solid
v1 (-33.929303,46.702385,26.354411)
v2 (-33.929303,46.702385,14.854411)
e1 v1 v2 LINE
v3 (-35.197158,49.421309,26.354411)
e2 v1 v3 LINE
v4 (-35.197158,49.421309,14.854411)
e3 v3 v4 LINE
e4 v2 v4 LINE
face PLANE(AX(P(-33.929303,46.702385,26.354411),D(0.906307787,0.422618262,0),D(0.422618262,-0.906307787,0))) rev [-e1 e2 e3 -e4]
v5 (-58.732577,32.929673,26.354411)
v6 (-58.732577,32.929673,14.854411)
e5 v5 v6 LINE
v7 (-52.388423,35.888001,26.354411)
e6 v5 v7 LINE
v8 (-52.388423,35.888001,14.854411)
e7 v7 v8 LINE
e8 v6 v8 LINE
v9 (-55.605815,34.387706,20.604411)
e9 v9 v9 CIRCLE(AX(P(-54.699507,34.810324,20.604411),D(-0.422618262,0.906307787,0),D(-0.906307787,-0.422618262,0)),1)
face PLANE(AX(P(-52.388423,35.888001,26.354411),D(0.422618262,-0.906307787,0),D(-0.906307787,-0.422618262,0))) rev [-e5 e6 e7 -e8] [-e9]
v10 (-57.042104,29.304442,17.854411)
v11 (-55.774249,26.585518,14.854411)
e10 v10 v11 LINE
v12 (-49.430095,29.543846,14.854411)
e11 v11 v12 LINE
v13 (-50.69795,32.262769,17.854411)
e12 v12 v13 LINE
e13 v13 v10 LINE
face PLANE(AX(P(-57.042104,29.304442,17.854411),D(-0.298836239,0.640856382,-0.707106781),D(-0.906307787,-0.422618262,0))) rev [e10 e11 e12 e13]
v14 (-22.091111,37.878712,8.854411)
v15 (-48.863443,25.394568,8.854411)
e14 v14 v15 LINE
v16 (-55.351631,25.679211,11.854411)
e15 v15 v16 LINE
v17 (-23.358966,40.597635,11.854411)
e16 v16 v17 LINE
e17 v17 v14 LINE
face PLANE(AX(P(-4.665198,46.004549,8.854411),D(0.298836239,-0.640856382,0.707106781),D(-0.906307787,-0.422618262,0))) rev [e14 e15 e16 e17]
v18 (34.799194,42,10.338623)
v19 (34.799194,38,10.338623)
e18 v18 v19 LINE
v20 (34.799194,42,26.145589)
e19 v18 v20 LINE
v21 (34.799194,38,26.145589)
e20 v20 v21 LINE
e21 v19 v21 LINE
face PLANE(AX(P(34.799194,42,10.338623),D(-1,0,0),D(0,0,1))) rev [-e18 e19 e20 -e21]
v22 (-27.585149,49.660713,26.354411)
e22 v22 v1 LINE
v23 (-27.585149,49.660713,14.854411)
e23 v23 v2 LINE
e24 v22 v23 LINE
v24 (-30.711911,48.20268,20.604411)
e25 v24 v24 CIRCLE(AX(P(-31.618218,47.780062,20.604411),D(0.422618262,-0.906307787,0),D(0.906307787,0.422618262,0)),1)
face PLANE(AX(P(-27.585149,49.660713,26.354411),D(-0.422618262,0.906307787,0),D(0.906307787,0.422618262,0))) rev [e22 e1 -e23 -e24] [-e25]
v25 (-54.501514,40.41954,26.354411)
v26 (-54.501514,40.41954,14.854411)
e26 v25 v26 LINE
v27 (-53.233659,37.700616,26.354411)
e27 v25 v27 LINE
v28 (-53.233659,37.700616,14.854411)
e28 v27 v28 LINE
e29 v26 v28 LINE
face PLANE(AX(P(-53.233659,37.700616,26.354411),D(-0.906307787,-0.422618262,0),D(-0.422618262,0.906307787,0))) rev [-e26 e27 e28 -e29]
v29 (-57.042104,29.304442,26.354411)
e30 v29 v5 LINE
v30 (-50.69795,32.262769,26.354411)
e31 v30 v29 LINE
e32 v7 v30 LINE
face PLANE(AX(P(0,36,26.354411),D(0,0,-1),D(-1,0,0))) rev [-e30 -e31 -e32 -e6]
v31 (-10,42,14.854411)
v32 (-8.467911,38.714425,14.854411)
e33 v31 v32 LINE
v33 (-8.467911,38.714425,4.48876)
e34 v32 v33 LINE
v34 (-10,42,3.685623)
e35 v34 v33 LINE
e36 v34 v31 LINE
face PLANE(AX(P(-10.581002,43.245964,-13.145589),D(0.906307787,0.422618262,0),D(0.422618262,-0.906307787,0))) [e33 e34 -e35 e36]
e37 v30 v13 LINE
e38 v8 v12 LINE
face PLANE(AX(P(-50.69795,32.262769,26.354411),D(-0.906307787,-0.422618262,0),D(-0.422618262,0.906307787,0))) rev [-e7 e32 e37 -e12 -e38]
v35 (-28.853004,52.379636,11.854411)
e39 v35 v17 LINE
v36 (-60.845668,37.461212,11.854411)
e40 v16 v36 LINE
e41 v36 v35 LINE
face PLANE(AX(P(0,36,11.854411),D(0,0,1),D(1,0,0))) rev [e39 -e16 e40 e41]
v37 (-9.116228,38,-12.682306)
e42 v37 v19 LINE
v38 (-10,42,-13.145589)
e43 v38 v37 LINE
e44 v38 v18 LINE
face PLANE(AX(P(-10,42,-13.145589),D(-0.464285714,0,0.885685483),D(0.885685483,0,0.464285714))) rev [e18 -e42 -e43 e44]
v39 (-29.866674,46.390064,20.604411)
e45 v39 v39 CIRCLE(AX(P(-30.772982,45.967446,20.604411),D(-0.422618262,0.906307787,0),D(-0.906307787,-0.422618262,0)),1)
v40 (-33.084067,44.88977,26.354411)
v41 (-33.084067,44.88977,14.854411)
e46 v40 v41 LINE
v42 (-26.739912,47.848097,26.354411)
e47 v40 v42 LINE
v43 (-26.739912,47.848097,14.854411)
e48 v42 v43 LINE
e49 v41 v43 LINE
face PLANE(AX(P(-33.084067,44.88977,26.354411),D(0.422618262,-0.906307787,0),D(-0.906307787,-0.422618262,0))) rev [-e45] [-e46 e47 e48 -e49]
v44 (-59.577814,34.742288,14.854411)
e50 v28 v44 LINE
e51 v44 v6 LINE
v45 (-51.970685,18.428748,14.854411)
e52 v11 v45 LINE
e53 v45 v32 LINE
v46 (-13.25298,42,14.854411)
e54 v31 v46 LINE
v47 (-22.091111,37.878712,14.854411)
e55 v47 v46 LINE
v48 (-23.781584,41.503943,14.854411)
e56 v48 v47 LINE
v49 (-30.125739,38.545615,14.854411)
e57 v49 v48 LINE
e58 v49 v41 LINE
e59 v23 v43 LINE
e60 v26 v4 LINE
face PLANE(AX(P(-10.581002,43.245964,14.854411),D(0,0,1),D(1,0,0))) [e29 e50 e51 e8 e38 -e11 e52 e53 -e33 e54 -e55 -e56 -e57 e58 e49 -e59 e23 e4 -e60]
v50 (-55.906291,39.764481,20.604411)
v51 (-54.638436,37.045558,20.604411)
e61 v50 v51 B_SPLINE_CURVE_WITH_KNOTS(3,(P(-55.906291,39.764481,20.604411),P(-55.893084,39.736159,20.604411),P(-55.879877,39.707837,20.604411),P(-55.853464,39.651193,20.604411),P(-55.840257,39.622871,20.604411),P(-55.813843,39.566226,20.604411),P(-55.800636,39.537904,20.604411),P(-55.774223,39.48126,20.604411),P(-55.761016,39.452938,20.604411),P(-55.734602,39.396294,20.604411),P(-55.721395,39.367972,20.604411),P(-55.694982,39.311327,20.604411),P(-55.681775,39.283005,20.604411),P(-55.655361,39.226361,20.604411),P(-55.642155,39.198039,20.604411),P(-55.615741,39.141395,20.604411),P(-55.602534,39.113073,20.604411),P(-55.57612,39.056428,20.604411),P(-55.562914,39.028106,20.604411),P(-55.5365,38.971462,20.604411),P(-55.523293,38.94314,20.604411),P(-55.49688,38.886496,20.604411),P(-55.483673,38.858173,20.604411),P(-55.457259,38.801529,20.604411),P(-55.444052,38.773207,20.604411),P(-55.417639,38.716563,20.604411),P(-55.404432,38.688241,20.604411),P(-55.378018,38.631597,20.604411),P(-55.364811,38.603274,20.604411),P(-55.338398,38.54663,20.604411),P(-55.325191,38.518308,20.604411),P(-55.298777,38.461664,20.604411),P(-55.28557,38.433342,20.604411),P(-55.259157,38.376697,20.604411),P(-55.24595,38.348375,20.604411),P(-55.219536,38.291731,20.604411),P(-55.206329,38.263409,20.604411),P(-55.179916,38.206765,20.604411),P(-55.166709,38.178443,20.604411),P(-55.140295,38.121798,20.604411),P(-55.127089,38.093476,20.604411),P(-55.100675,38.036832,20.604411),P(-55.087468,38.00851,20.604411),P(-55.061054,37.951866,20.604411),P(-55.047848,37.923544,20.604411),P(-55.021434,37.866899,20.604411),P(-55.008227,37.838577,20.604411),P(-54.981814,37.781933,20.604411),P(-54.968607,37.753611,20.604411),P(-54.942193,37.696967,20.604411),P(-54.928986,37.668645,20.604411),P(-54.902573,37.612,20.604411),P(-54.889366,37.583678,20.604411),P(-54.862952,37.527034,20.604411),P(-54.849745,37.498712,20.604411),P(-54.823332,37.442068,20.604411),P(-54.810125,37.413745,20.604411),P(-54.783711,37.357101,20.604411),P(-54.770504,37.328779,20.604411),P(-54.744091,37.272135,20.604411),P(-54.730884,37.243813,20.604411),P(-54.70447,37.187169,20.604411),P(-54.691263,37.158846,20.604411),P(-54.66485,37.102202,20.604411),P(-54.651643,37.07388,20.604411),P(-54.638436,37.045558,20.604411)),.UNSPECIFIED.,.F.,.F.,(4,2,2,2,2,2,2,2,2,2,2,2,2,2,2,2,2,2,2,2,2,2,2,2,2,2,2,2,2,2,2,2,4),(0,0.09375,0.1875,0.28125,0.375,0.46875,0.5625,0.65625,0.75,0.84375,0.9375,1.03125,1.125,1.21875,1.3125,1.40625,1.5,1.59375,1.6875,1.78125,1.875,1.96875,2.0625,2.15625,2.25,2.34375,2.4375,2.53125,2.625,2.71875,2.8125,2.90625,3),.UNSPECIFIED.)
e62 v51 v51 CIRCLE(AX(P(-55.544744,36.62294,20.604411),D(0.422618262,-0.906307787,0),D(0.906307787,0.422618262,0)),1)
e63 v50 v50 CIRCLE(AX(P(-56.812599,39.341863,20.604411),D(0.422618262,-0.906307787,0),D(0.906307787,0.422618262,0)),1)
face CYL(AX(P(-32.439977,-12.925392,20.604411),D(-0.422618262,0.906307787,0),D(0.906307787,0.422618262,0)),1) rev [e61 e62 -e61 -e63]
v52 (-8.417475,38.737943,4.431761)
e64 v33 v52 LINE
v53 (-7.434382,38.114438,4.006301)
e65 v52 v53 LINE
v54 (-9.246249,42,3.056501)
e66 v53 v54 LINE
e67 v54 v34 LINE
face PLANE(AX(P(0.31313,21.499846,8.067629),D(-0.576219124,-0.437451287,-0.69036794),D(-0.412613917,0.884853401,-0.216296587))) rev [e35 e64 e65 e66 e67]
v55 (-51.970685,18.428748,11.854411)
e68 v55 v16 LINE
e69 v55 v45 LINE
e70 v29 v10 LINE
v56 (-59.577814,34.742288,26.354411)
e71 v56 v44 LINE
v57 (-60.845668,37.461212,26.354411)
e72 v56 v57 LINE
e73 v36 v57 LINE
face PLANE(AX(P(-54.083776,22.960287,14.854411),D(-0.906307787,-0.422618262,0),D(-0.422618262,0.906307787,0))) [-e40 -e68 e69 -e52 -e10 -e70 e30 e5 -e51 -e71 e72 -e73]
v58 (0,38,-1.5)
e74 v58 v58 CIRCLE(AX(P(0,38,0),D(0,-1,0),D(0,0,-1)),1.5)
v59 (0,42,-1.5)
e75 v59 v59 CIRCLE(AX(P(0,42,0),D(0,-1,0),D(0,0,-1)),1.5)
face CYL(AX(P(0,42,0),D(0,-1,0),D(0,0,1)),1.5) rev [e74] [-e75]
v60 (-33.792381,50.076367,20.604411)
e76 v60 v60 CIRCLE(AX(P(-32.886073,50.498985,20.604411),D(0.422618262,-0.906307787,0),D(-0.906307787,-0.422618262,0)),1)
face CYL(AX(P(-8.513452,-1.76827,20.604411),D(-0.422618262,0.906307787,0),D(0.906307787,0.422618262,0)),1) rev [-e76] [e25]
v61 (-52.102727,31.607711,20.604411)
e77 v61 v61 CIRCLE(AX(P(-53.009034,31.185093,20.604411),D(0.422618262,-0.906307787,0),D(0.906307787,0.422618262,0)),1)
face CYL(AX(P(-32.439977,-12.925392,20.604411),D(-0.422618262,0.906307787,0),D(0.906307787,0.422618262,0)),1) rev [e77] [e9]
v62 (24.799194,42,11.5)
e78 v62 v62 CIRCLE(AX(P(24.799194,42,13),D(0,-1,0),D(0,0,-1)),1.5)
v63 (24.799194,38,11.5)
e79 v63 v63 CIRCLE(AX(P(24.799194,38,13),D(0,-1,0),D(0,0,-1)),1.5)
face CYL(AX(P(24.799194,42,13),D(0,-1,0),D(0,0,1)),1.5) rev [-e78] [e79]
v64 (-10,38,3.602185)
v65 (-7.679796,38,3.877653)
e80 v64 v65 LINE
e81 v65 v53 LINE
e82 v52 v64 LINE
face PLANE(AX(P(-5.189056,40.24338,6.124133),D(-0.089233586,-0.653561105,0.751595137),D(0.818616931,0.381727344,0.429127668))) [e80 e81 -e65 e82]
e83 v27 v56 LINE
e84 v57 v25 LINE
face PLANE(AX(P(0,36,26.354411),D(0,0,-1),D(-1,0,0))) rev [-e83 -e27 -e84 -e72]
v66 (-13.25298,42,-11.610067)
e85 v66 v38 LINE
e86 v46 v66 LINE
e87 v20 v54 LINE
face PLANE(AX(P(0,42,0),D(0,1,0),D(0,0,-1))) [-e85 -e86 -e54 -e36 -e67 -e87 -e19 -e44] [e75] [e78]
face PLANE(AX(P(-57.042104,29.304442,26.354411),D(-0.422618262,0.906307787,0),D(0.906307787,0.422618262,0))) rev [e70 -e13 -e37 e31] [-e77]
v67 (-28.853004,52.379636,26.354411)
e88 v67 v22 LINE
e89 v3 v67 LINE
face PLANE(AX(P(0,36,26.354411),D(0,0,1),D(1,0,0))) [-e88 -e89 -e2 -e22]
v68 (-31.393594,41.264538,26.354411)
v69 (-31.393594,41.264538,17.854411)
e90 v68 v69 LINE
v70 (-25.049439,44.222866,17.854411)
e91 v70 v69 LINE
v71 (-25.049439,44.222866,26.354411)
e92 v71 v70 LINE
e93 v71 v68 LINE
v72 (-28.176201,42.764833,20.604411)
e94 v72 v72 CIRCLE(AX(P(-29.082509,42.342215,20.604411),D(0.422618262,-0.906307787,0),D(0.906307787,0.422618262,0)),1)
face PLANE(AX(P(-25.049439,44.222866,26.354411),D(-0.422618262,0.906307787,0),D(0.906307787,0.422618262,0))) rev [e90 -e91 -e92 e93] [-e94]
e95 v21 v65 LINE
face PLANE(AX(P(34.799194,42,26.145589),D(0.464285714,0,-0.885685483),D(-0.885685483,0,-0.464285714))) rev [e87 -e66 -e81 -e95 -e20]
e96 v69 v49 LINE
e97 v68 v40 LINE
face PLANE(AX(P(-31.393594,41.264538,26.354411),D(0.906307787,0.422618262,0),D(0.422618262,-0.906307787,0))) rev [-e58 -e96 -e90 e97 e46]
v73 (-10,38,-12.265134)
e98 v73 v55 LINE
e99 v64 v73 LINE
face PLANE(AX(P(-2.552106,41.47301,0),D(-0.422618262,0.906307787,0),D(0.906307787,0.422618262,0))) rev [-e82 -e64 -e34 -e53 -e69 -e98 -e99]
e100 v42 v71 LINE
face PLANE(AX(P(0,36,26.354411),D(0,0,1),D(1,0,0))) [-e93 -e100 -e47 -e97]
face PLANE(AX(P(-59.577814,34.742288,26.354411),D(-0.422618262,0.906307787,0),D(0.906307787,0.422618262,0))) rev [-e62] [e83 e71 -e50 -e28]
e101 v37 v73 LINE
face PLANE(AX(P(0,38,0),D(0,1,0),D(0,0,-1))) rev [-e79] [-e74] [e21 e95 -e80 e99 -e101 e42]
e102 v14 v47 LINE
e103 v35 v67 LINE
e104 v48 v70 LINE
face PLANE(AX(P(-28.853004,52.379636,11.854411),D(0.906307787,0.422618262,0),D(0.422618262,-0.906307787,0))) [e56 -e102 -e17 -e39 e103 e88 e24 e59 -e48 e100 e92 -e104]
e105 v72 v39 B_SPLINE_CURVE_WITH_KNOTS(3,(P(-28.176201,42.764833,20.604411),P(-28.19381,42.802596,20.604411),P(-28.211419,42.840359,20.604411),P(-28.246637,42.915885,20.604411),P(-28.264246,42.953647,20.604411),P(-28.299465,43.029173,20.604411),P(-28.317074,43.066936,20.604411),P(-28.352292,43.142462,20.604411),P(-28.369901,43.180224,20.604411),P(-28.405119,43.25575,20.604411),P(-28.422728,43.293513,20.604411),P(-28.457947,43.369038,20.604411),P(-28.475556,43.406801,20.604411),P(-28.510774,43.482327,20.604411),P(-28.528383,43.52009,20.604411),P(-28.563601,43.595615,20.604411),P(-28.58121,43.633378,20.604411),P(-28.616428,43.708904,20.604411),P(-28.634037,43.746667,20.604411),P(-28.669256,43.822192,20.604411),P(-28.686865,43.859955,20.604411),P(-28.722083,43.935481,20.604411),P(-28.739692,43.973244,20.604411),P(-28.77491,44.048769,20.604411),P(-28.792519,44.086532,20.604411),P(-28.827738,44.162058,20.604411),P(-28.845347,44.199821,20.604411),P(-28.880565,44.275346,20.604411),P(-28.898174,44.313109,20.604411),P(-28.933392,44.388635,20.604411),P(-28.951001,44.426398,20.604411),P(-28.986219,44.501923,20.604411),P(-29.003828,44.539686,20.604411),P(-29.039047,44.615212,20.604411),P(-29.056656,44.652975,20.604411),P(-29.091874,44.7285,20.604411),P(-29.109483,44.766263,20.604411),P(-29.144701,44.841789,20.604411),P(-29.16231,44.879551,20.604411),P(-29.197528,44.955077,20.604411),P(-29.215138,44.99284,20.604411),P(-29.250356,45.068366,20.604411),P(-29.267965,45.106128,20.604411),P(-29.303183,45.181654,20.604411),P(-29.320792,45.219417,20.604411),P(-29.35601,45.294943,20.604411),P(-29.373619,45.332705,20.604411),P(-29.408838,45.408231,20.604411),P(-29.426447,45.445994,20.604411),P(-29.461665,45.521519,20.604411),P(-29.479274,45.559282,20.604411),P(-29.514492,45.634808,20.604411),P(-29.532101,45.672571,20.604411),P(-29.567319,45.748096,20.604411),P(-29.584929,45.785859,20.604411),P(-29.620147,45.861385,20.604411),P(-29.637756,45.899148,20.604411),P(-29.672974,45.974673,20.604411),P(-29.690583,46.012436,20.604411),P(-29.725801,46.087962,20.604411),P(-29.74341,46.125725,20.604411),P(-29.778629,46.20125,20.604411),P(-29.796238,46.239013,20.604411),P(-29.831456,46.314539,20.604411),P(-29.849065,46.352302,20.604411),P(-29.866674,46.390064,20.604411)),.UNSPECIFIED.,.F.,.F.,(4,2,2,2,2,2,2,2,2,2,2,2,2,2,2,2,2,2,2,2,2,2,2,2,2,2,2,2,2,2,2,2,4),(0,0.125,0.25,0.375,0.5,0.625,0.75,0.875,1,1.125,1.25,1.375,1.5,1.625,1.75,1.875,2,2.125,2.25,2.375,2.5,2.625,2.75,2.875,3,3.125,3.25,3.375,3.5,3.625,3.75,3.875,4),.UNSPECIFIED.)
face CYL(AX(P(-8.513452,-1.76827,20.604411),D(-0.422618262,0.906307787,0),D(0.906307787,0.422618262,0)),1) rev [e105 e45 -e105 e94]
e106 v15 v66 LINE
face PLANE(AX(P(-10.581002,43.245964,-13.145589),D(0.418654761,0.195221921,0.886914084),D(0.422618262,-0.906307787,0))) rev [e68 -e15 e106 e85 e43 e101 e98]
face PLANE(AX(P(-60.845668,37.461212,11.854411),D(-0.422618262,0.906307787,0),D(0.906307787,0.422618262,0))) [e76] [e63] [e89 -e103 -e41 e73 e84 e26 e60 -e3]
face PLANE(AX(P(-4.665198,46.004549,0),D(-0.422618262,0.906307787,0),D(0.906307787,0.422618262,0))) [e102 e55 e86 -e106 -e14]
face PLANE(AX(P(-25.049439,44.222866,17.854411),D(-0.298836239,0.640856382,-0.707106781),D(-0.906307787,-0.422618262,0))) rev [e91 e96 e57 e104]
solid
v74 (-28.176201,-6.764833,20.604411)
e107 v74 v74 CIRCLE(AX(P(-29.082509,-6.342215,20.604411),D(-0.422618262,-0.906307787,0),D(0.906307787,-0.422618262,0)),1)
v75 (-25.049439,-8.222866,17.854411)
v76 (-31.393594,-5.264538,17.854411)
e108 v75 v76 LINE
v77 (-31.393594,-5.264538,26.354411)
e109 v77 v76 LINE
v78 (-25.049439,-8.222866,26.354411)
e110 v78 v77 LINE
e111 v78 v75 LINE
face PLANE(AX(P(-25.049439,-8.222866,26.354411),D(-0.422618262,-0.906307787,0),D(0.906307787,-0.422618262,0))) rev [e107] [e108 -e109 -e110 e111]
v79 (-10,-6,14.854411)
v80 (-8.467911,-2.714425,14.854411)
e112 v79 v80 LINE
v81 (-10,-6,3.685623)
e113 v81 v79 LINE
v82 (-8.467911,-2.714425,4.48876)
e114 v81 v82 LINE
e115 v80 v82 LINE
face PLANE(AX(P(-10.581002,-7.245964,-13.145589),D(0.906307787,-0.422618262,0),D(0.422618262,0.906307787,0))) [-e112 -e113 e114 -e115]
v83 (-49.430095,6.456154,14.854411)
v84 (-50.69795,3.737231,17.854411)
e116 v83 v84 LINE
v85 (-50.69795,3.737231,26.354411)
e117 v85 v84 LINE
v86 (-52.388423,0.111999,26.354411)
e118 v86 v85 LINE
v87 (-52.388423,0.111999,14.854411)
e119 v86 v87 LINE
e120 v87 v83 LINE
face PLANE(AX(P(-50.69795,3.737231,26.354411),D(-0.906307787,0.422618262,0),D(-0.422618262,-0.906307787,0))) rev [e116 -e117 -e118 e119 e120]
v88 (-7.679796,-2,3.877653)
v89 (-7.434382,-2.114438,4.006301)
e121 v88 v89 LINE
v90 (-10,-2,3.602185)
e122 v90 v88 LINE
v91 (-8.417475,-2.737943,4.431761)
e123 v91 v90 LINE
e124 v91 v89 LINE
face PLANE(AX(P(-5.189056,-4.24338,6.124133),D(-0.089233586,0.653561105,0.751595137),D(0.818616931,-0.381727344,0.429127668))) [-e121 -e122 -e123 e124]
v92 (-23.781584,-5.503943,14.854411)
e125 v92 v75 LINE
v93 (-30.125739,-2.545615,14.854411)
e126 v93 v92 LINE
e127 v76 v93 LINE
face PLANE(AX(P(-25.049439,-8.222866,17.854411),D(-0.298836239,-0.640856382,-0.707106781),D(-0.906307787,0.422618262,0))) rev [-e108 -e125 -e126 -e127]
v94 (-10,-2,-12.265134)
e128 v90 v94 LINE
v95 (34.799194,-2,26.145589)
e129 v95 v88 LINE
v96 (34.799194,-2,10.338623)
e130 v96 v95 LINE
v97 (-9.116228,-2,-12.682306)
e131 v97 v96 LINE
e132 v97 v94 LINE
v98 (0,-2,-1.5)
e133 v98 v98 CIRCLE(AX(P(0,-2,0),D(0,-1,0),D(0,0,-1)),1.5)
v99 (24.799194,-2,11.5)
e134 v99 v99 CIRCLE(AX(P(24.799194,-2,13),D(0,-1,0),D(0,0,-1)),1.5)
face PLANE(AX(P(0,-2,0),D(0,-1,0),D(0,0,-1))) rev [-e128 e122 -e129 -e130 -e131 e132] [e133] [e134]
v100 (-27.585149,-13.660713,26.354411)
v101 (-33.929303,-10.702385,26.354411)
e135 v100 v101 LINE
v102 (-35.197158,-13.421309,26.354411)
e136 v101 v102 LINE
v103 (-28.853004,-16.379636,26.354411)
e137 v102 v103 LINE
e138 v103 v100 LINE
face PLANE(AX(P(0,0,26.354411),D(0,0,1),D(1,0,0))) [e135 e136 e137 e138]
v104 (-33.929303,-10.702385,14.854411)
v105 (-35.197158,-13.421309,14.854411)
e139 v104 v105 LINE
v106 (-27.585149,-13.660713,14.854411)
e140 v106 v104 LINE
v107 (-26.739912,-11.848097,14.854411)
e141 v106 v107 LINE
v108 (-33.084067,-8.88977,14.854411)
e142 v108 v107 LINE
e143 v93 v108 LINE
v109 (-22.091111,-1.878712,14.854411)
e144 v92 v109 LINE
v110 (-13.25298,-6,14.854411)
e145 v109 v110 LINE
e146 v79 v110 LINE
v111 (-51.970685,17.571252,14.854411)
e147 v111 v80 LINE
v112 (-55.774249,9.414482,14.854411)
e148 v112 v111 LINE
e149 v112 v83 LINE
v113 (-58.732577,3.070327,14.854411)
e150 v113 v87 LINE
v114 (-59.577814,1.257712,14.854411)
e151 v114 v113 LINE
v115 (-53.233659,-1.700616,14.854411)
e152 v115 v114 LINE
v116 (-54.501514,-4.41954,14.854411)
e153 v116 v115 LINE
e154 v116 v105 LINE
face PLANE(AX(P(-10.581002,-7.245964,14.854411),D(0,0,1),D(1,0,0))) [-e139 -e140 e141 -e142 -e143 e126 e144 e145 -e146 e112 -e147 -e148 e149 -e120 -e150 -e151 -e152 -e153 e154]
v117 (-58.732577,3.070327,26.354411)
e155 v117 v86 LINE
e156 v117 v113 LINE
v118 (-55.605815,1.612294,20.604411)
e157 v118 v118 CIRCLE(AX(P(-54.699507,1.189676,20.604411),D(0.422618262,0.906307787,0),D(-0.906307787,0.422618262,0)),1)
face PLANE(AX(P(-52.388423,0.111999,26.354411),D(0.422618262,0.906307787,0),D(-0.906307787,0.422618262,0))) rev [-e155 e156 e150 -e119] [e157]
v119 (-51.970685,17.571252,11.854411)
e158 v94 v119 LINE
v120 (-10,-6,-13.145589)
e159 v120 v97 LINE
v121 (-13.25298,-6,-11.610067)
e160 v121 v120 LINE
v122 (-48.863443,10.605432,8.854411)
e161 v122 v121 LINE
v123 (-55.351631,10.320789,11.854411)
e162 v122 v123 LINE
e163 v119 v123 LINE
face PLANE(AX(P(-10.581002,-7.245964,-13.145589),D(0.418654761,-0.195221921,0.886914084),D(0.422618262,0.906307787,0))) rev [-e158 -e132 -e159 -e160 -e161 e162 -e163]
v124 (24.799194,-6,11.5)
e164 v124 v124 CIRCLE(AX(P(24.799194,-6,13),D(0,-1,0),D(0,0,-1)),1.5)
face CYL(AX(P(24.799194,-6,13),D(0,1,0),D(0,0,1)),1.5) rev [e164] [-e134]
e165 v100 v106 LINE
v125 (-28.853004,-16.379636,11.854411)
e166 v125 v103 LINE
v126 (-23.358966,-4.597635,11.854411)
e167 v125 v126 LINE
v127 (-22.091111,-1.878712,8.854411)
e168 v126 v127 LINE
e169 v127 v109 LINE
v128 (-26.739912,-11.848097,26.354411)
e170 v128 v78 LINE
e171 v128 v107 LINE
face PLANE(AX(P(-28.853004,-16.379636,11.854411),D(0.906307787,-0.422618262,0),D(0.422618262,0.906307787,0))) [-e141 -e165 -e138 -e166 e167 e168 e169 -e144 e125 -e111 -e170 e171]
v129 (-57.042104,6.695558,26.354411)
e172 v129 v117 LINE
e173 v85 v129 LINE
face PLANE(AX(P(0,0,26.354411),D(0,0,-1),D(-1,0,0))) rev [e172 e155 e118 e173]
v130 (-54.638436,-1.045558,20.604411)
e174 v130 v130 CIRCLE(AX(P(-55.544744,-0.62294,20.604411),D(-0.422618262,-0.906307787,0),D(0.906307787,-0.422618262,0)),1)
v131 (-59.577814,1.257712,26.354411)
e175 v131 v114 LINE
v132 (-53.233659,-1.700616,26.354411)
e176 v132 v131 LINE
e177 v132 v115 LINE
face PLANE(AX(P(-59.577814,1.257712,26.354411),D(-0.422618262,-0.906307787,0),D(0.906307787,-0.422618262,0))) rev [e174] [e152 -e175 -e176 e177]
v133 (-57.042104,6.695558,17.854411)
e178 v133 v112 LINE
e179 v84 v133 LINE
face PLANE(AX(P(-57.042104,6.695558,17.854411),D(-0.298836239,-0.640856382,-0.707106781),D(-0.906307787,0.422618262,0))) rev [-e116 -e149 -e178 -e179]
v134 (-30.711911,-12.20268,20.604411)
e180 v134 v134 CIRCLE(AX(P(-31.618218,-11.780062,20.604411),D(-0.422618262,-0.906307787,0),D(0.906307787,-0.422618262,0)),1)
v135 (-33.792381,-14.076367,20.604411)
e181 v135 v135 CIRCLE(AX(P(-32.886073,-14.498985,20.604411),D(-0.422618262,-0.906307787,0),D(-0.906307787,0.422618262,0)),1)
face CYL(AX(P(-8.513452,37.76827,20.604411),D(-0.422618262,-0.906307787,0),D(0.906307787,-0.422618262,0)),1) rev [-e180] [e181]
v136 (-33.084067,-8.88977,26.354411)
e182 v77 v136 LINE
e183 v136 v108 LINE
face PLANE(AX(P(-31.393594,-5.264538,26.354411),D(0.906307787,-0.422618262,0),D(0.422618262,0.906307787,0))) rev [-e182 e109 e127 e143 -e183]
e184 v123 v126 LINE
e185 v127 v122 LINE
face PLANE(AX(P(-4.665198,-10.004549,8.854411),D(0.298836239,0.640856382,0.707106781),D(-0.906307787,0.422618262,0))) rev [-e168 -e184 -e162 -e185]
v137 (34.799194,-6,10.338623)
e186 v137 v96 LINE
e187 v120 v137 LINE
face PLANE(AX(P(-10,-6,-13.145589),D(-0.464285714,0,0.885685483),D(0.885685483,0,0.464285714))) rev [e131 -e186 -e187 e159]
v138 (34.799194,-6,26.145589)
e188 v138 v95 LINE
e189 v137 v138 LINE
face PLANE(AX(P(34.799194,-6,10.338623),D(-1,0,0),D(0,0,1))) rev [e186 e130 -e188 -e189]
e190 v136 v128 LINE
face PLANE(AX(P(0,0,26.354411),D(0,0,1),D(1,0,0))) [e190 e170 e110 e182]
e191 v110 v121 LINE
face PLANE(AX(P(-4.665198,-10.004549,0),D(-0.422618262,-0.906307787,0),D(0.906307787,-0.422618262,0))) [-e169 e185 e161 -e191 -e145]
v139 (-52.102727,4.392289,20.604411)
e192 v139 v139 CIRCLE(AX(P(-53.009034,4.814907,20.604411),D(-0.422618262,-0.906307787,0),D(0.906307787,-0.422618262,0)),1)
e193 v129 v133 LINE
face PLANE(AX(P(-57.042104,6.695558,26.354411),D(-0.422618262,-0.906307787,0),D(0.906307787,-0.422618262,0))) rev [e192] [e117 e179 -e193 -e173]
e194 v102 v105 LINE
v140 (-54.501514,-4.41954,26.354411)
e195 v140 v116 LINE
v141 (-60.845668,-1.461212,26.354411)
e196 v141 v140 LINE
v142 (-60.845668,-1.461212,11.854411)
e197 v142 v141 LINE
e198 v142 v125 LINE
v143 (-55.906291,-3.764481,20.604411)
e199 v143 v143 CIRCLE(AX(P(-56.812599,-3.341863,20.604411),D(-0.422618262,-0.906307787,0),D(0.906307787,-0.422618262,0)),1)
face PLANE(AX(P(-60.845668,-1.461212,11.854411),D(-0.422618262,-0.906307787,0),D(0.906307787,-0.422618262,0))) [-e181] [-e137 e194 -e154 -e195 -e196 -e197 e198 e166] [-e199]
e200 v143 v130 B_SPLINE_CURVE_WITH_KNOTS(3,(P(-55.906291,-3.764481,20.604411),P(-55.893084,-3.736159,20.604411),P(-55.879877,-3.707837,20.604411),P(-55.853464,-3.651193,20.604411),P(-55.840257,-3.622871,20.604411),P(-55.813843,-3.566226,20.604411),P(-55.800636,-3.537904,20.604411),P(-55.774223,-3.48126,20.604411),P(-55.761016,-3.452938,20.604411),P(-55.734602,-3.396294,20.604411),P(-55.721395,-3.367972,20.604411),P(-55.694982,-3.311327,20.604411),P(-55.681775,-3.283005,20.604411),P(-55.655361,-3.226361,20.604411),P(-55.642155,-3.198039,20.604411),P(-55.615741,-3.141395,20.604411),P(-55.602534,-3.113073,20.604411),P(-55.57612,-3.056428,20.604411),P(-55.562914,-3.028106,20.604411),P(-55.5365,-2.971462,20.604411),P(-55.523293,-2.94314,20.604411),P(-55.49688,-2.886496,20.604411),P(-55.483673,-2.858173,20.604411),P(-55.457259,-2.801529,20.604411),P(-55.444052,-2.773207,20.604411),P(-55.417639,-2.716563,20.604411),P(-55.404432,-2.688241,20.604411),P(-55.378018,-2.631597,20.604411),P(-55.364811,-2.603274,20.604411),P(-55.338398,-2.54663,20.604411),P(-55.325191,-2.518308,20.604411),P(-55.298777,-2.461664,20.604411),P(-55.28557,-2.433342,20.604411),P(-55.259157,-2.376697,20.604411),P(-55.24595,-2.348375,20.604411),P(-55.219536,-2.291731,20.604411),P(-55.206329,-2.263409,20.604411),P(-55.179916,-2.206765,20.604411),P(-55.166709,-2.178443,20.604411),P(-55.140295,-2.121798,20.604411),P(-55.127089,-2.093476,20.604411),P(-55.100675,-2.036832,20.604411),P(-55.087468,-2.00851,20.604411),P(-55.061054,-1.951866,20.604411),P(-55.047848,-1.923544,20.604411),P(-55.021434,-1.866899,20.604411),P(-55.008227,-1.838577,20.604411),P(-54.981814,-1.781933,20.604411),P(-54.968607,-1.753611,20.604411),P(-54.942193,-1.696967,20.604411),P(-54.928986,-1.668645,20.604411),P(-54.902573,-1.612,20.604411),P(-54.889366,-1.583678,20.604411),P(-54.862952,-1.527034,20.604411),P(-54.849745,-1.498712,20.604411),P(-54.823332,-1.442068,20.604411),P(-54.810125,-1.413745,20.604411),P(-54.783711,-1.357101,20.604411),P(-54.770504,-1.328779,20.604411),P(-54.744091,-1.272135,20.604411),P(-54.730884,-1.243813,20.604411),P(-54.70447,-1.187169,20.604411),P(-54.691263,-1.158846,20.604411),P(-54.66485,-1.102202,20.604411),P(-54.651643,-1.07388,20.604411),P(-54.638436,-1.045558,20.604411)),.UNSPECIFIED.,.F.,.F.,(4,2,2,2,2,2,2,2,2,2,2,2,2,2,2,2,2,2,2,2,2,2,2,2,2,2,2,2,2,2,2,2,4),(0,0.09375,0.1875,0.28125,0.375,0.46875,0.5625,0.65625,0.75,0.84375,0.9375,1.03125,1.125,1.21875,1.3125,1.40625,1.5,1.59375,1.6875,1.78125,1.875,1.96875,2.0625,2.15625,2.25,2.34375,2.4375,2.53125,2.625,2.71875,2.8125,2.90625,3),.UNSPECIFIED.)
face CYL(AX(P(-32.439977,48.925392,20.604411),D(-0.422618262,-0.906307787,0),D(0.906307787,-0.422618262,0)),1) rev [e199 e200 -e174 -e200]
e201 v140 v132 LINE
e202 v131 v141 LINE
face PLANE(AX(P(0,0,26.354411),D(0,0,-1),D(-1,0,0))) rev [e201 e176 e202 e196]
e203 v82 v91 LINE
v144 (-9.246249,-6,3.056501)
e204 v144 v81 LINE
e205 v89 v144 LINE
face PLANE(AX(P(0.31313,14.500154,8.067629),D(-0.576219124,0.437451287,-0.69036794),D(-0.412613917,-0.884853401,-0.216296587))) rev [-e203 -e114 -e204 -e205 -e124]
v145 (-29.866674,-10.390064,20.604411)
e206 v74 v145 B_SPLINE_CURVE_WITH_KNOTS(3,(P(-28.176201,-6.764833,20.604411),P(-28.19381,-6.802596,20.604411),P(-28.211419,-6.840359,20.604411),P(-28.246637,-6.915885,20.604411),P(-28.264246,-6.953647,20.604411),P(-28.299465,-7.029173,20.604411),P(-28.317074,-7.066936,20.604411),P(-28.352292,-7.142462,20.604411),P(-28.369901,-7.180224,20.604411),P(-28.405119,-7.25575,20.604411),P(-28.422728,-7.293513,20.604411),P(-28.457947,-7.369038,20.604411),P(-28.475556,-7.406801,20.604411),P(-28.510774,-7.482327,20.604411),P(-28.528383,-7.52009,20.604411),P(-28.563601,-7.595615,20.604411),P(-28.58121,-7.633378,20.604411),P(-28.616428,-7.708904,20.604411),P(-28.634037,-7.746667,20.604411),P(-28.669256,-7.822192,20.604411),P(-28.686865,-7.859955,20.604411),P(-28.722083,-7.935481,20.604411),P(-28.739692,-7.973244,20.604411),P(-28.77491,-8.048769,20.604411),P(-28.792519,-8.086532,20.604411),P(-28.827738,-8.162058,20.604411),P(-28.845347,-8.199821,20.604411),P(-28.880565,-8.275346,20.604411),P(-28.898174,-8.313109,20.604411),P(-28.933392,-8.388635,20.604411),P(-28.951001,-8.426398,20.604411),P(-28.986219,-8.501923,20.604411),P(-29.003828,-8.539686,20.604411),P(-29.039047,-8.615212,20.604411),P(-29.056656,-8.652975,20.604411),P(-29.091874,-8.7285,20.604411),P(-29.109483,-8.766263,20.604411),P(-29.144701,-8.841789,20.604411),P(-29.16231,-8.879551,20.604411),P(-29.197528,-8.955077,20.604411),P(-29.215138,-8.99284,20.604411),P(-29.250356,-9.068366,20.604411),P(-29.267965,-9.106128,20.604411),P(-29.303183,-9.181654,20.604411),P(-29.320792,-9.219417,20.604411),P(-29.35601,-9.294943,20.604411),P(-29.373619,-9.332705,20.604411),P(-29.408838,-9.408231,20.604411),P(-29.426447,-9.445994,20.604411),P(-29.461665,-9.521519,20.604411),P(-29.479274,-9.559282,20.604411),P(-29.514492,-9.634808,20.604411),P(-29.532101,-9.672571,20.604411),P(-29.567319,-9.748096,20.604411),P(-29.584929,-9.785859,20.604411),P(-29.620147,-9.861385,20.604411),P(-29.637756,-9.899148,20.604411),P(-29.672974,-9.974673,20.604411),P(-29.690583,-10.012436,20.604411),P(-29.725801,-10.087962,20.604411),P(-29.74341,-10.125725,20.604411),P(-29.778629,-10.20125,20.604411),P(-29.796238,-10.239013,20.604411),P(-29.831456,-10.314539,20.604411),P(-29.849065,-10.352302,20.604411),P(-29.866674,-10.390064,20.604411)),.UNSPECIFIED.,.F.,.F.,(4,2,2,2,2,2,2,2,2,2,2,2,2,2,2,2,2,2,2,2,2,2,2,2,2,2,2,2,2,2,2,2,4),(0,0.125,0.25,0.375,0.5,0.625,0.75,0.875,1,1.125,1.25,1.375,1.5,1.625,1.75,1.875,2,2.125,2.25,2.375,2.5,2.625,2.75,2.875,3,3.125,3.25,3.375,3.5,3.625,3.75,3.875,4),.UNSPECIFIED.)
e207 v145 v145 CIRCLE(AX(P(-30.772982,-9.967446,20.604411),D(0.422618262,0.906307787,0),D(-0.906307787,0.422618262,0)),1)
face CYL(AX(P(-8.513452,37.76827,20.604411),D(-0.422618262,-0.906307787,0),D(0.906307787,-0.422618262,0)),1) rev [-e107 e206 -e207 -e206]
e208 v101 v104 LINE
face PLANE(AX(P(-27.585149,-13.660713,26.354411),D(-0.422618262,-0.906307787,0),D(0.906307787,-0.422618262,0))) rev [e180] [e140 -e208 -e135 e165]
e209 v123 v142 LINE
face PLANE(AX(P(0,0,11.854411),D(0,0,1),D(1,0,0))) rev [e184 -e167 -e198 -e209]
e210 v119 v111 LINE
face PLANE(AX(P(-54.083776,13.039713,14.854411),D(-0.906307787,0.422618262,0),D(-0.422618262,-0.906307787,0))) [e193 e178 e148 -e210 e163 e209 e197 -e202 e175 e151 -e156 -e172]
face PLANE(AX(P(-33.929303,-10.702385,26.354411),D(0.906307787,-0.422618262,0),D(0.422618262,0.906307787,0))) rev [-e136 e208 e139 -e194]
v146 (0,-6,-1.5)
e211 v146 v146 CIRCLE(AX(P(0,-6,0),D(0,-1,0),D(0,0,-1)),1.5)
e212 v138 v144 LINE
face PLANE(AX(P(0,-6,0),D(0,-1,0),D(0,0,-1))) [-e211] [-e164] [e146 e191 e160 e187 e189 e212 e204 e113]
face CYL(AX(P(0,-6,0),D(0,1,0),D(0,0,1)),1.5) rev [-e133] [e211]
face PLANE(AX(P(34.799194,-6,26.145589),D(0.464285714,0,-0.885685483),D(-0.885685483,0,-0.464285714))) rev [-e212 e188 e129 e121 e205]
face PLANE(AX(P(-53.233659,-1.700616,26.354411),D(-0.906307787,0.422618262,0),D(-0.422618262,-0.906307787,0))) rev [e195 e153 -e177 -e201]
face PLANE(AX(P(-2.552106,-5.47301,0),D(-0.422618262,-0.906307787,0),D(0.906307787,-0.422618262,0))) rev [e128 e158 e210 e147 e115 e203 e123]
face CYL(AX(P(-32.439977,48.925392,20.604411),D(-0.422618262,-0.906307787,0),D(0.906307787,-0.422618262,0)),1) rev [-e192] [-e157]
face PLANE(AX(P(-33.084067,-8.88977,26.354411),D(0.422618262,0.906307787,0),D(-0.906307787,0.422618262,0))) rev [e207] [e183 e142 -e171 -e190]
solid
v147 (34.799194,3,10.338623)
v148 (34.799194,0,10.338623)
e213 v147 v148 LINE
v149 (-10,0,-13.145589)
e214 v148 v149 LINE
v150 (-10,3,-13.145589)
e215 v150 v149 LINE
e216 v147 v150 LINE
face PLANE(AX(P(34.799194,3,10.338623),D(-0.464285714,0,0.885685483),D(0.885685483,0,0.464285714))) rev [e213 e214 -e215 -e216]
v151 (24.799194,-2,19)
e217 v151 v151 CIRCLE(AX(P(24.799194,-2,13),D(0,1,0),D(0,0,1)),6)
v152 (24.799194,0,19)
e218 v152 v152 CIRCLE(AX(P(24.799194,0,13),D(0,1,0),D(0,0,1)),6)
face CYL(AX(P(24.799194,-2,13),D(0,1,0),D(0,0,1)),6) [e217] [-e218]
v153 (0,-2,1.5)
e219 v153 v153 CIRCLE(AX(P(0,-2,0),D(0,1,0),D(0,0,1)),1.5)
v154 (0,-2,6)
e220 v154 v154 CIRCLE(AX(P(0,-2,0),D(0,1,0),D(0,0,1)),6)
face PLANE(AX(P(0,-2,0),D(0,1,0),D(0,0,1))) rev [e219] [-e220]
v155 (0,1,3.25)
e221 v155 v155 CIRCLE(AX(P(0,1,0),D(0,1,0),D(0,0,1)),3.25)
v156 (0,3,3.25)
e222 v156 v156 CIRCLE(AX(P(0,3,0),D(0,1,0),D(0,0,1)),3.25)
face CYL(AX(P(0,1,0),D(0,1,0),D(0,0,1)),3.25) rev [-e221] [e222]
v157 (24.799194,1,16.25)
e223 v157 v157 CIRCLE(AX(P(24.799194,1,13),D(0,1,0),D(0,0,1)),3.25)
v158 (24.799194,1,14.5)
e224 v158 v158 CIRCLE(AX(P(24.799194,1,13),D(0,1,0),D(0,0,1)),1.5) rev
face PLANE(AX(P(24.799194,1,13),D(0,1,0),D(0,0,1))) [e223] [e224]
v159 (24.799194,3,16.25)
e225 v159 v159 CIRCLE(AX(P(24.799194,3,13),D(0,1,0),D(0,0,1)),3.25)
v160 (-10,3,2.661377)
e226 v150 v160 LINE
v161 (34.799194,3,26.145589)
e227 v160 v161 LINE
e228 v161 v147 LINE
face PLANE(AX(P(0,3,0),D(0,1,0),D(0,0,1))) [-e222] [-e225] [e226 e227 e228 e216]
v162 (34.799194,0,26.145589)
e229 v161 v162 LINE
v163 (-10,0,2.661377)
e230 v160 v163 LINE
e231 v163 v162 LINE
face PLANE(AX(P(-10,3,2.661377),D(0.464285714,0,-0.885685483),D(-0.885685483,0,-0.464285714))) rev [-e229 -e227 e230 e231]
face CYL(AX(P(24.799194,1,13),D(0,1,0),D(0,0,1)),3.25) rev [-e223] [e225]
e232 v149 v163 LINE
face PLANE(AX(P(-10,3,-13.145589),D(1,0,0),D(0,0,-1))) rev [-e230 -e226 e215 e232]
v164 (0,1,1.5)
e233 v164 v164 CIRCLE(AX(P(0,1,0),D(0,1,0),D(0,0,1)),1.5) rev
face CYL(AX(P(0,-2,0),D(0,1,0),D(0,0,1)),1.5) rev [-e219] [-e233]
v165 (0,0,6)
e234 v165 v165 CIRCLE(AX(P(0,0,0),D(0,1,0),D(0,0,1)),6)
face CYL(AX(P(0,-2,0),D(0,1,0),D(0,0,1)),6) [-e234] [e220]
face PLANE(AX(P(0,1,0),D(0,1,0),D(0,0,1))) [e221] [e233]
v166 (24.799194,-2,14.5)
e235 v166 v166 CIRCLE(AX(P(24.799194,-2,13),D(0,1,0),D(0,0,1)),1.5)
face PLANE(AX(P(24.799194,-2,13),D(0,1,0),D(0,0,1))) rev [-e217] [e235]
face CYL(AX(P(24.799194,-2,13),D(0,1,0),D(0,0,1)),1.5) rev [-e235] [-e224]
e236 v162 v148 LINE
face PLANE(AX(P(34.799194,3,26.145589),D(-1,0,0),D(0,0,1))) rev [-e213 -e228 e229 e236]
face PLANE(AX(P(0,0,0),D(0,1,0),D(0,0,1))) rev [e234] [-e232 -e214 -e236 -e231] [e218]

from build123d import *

# Parameters (mm, degrees)
BOSS_EXTRUDE1_DEPTH  = 3
SKETCH1_R            = 6
SKETCH1_R_2          = 5.999999999999998
BOSS_EXTRUDE3_DEPTH  = 2
SKETCH4_R            = 1.5000000000000013
SKETCH4_R_2          = 1.5000000000000009
CUT_EXTRUDE1_DEPTH   = 44.812962496801305
SKETCH5_R            = 3.25
SKETCH5_R_2          = 3.2500000000000004
CUT_EXTRUDE2_DEPTH   = 2
SKETCH6_R            = 1.5000000000000013
SKETCH6_R_2          = 1.5000000000000009
BOSS_EXTRUDE4_DEPTH  = 4
BOSS_EXTRUDE9_DEPTH  = 5
BOSS_EXTRUDE10_DEPTH = 3
BOSS_EXTRUDE11_DEPTH = 11.5
SKETCH24_R           = 0.9999999999999983
CUT_EXTRUDE3_DEPTH   = 71.05142175706676
CUT_EXTRUDE4_DEPTH   = 71.37296543116399
CUT_EXTRUDE5_DEPTH   = 75.00527115702536
CHAMFER2_SIZE        = 1
CHAMFER2_SIZE_2      = 0.849779112
CHAMFER2_SIZE_3      = 0.753042781
CHAMFER3_SIZE        = 48
CHAMFER3_SIZE_2      = 25
CHAMFER4_SIZE        = 3
CHAMFER5_SIZE        = 3


with BuildPart() as part:
    # Sketch3 → Boss-Extrude1 (new body)
    with BuildSketch(Plane(origin=(0, 0, 0), x_dir=(1, 0, 0), z_dir=(0, 1, 0))):
        Polygon((-10, 13.145588768291844), (-9.999999999999998, -2.66137686720019), (34.79919353527449, -26.14558876829183), (34.79919353527449, -10.33862313279981), align=None)
    extrude(amount=BOSS_EXTRUDE1_DEPTH)

    # Sketch1 → Boss-Extrude3 (add)
    with BuildSketch(Plane(origin=(0, 0, 0), x_dir=(1, 0, 0), z_dir=(0, 1, 0))):
        with Locations(Location((0, 0, 0), (0, 0, 270))):
            Circle(SKETCH1_R)
        with Locations(Location((24.79919353527449, -13.000000000000002, 0), (0, 0, 270))):
            Circle(SKETCH1_R_2)
    extrude(amount=-BOSS_EXTRUDE3_DEPTH)

    # Sketch4 → Cut-Extrude1 (cut, through all)
    with BuildSketch(Plane(origin=(0, 3, 0), x_dir=(1, 0, 0), z_dir=(0, 1, 0))):
        with Locations(Location((0, 0, 0), (0, 0, 270))):
            Circle(SKETCH4_R)
        with Locations(Location((24.79919353527449, -13.000000000000002, 0), (0, 0, 270))):
            Circle(SKETCH4_R_2)
    extrude(amount=-CUT_EXTRUDE1_DEPTH, mode=Mode.SUBTRACT)

    # Sketch5 → Cut-Extrude2 (cut)
    with BuildSketch(Plane(origin=(0, 3, 0), x_dir=(1, 0, 0), z_dir=(0, 1, 0))):
        with Locations(Location((0, 0, 0), (0, 0, 270))):
            Circle(SKETCH5_R)
        with Locations(Location((24.79919353527449, -13.000000000000002, 0), (0, 0, 270))):
            Circle(SKETCH5_R_2)
    extrude(amount=-CUT_EXTRUDE2_DEPTH, mode=Mode.SUBTRACT)


with BuildPart() as body_2:
    # Sketch6 → Boss-Extrude4 (new body)
    with BuildSketch(Plane.XZ.offset(2)):
        Polygon((-9.999999999999998, 2.66137686720019), (-10, -13.145588768291844), (34.79919353527449, 10.33862313279981), (34.79919353527449, 26.14558876829183), align=None)
        with Locations(Location((0, 0, 0), (0, 0, 270))):
            Circle(SKETCH6_R, mode=Mode.SUBTRACT)
        with Locations(Location((24.79919353527449, 13.000000000000002, 0), (0, 0, 270))):
            Circle(SKETCH6_R_2, mode=Mode.SUBTRACT)
    extrude(amount=BOSS_EXTRUDE4_DEPTH)

    # Sketch19 → Boss-Extrude9 (add)
    with BuildSketch(Plane(origin=(-2.5521063946862226, -5.473009825281398, 2.8e-16), x_dir=(0.9063077870366528, -0.42261826174069356, 0), z_dir=(0.42261826174069356, 0.9063077870366528, 0))):
        Polygon((-6.527368299922367, 13.145588768291844), (-6.5273682999223634, -14.854411231708156), (-54.52736829992237, -14.854411231708161), (-54.52736829992237, 13.145588768291844), align=None)
    extrude(amount=-BOSS_EXTRUDE9_DEPTH)

    # Sketch22 → Boss-Extrude10 (add)
    with BuildSketch(Plane.XY.offset(14.854411231708154)):
        Polygon((-51.9706848915214, 17.571251782926392), (-60.84566838807596, -1.4612117448433186), (-28.85300350568211, -16.379636384289785), (-19.97802000912756, 2.652827143479914), align=None)
    extrude(amount=-BOSS_EXTRUDE10_DEPTH)

    # Sketch23 → Boss-Extrude11 (add)
    with BuildSketch(Plane.XY.offset(14.854411231708154)):
        Polygon((-58.73257707937249, 3.0703271903399454), (-57.04210403240972, 6.695558338486558), (-50.697949523153156, 3.737230506301715), (-52.38842257011593, 0.11199935815509857), align=None)
        Polygon((-60.84566838807596, -1.4612117448433186), (-59.57781360285388, 1.2577116162666404), (-53.23365909359731, -1.7006162159182072), (-54.501513878819395, -4.419539577028165), align=None)
        Polygon((-35.19715801493865, -13.421308552104925), (-28.85300350568211, -16.379636384289785), (-27.58514872046003, -13.6607130231798), (-33.92930322971659, -10.702385190994963), align=None)
        Polygon((-33.0840667062352, -8.88976961692166), (-26.73991219697864, -11.8480974491065), (-25.049439150015868, -8.222866300959888), (-31.393593659272426, -5.264538468775042), align=None)
    extrude(amount=BOSS_EXTRUDE11_DEPTH)

    # Sketch24 → Cut-Extrude3 (cut, through all)
    with BuildSketch(Plane(origin=(-11.42708989124078, -24.505473353051112, 0), x_dir=(0.9063077870366529, -0.4226182617406931, 0), z_dir=(-0.42261826174069306, -0.9063077870366528, 0))):
        with Locations((-50.077368299922384, 20.604411231708156)):
            Circle(SKETCH24_R)
        with Locations((-23.677368299922374, 20.60441123170816)):
            Circle(SKETCH24_R)
    extrude(amount=-CUT_EXTRUDE3_DEPTH, mode=Mode.SUBTRACT)

    # Sketch25 → Cut-Extrude4 (cut, through all)
    with BuildSketch(Plane.XZ.offset(5.999999999999999)):
        Polygon((-1.7598045547698953, -8.82599101058171), (-0.856014781659975, -22.343448840083095), (-19.416391366852192, -22.343448840083095), (-12.561706832548245, 28.592130084052375), (-0.856014781659975, 28.592130084052375), align=None)
    extrude(amount=CUT_EXTRUDE4_DEPTH, mode=Mode.SUBTRACT)

    # Sketch26 → Cut-Extrude5 (cut, through all)
    with BuildSketch(Plane(origin=(3.2500000000000018, 0, -6.1997983838186235), x_dir=(-0.8856854834026603, 0, -0.46428571428571436), z_dir=(0.4642857142857144, 0, -0.8856854834026604))):
        Polygon((-2.6471574670381415, -3.4708885976233637), (-2.0453444794839015, -11.294457435868079), (36.03300455139902, -14.522363460038978), (23.996744800257375, 7.088193820427202), align=None)
    extrude(amount=CUT_EXTRUDE5_DEPTH, mode=Mode.SUBTRACT)

    # Chamfer2
    # the kernel refuses this chamfer: 1, 0.849779112, 0.753042781 mm, written as the material it adds along each edge
    with BuildSketch(Plane(origin=(-6.36268787947312, -3.696106496901656, 4.568094418300827), x_dir=(0.33809036708449836, 0.9242749779914556, 0.17723055251158967), z_dir=(-0.8186169306793458, 0.38172734387111207, -0.4291276683531757))) as chamfer2_piece_1_section:
        Polygon((CHAMFER2_SIZE, -2e-17), (CHAMFER2_SIZE_2 * 0.196215621581, -CHAMFER2_SIZE_2 * 0.980560773459), (0, 0), align=None)
    chamfer2_piece_1 = extrude(amount=7.014923756891123, mode=Mode.PRIVATE)
    chamfer2_piece_1 = split(chamfer2_piece_1, bisect_by=Plane(origin=(-6.36268787947312, -2, 4.568094418300827), z_dir=(0, -1, 0)), keep=Keep.TOP, mode=Mode.PRIVATE)
    chamfer2_piece_1 = split(chamfer2_piece_1, bisect_by=Plane(origin=(-8.46791111376206, -2.714424780626905, 4.568094418300827), z_dir=(-0.9063077870366527, 0.4226182617406935, 0)), keep=Keep.TOP, mode=Mode.PRIVATE)
    add(chamfer2_piece_1)
    with BuildSketch(Plane(origin=(-11.061112191786581, -8.275562438723423, 2.1051306137240746), x_dir=(-0.09141088767312612, -0.19603128122495278, 0.9763277044087783), z_dir=(0.4126139173265195, 0.884853401205295, 0.21629658712953703))) as chamfer2_piece_2_section:
        Polygon((CHAMFER2_SIZE, 0), (CHAMFER2_SIZE_3 * 0.420785758249, CHAMFER2_SIZE_3 * 0.907160044076), (0, 0), align=None)
    chamfer2_piece_2 = extrude(amount=8.85649542189165, mode=Mode.PRIVATE)
    chamfer2_piece_2 = split(chamfer2_piece_2, bisect_by=Plane(origin=(-11.061112191786581, -6, 2.1051306137240746), z_dir=(0, 1, 0)), keep=Keep.TOP, mode=Mode.PRIVATE)
    chamfer2_piece_2 = split(chamfer2_piece_2, bisect_by=Plane(origin=(-8.467911113762062, -2.7144247806268984, 2.105130613724074), z_dir=(-0.42261826174069356, -0.9063077870366528, 0)), keep=Keep.TOP, mode=Mode.PRIVATE)
    add(chamfer2_piece_2)
    with BuildSketch(Plane(origin=(-11.061112191786581, -8.275562438723423, 2.1051306137240746), x_dir=(-0.09141088767312612, -0.19603128122495278, 0.9763277044087783), z_dir=(0.4126139173265195, 0.884853401205295, 0.21629658712953703))) as chamfer2_piece_3a_section:
        Polygon((CHAMFER2_SIZE, 0), (CHAMFER2_SIZE_3 * 0.420785758249, CHAMFER2_SIZE_3 * 0.907160044076), (0, 0), align=None)
    chamfer2_piece_3a = extrude(amount=8.85649542189165, mode=Mode.PRIVATE)
    chamfer2_piece_3a = split(chamfer2_piece_3a, bisect_by=Plane(origin=(-11.061112191786581, -2, 2.1051306137240746), z_dir=(0, -1, 0)), keep=Keep.TOP, mode=Mode.PRIVATE)
    chamfer2_piece_3a = split(chamfer2_piece_3a, bisect_by=Plane(origin=(-8.467911113762062, -2.7144247806268993, 2.105130613724074), z_dir=(0.42261826174069356, 0.9063077870366528, 0)), keep=Keep.TOP, mode=Mode.PRIVATE)
    with BuildSketch(Plane(origin=(-6.36268787947312, -3.696106496901656, 4.568094418300827), x_dir=(0.33809036708449836, 0.9242749779914556, 0.17723055251158967), z_dir=(-0.8186169306793458, 0.38172734387111207, -0.4291276683531757))) as chamfer2_piece_3b_section:
        Polygon((CHAMFER2_SIZE, -2e-17), (CHAMFER2_SIZE_2 * 0.196215621581, -CHAMFER2_SIZE_2 * 0.980560773459), (0, 0), align=None)
    chamfer2_piece_3b = extrude(amount=7.014923756891123, mode=Mode.PRIVATE)
    chamfer2_piece_3b = split(chamfer2_piece_3b, bisect_by=Plane(origin=(-6.36268787947312, -2, 4.568094418300827), z_dir=(0, -1, 0)), keep=Keep.TOP, mode=Mode.PRIVATE)
    chamfer2_piece_3b = split(chamfer2_piece_3b, bisect_by=Plane(origin=(-8.46791111376206, -2.714424780626905, 4.568094418300827), z_dir=(0.9063077870366527, -0.4226182617406935, 0)), keep=Keep.TOP, mode=Mode.PRIVATE)
    chamfer2_piece_3 = chamfer2_piece_3a & chamfer2_piece_3b
    add(chamfer2_piece_3)

    # Chamfer3
    # the kernel refuses this chamfer: 48, 25 mm, written as the material it takes off along each edge
    with BuildSketch(Plane(origin=(0.5510317235878048, 130.20443654107186, -13.145588768291852), x_dir=(0.9063077870366527, -0.4226182617406935, 0), z_dir=(-0.4226182617406935, -0.9063077870366527, 0))) as chamfer3_piece_1:
        Polygon((CHAMFER3_SIZE, 0), (7.36e-15, CHAMFER3_SIZE_2), (0, 0), align=None)
    extrude(amount=253.55393800912003, mode=Mode.SUBTRACT)

    # Chamfer4
    chamfer4_edges = [body_2.edges().sort_by_distance(p)[0] for p in [
        (-38.08744375902795, 5.580500528019885, 11.854411231708156),
    ]]
    chamfer(chamfer4_edges, length=CHAMFER4_SIZE)

    # Chamfer5
    chamfer5_edges = [body_2.edges().sort_by_distance(p)[0] for p in [
        (-53.87002677778143, 5.216394422394137, 14.854411231708154),
        (-28.22151640464415, -6.743702384867465, 14.854411231708154),
    ]]
    chamfer(chamfer5_edges, length=CHAMFER5_SIZE)


with BuildPart() as body_3:
    # Mirror1: mirrored copy
    add(body_2.part.mirror(Plane.ZX.offset(18.000000000000004)))


solid = Compound([part.part, body_2.part, body_3.part])
